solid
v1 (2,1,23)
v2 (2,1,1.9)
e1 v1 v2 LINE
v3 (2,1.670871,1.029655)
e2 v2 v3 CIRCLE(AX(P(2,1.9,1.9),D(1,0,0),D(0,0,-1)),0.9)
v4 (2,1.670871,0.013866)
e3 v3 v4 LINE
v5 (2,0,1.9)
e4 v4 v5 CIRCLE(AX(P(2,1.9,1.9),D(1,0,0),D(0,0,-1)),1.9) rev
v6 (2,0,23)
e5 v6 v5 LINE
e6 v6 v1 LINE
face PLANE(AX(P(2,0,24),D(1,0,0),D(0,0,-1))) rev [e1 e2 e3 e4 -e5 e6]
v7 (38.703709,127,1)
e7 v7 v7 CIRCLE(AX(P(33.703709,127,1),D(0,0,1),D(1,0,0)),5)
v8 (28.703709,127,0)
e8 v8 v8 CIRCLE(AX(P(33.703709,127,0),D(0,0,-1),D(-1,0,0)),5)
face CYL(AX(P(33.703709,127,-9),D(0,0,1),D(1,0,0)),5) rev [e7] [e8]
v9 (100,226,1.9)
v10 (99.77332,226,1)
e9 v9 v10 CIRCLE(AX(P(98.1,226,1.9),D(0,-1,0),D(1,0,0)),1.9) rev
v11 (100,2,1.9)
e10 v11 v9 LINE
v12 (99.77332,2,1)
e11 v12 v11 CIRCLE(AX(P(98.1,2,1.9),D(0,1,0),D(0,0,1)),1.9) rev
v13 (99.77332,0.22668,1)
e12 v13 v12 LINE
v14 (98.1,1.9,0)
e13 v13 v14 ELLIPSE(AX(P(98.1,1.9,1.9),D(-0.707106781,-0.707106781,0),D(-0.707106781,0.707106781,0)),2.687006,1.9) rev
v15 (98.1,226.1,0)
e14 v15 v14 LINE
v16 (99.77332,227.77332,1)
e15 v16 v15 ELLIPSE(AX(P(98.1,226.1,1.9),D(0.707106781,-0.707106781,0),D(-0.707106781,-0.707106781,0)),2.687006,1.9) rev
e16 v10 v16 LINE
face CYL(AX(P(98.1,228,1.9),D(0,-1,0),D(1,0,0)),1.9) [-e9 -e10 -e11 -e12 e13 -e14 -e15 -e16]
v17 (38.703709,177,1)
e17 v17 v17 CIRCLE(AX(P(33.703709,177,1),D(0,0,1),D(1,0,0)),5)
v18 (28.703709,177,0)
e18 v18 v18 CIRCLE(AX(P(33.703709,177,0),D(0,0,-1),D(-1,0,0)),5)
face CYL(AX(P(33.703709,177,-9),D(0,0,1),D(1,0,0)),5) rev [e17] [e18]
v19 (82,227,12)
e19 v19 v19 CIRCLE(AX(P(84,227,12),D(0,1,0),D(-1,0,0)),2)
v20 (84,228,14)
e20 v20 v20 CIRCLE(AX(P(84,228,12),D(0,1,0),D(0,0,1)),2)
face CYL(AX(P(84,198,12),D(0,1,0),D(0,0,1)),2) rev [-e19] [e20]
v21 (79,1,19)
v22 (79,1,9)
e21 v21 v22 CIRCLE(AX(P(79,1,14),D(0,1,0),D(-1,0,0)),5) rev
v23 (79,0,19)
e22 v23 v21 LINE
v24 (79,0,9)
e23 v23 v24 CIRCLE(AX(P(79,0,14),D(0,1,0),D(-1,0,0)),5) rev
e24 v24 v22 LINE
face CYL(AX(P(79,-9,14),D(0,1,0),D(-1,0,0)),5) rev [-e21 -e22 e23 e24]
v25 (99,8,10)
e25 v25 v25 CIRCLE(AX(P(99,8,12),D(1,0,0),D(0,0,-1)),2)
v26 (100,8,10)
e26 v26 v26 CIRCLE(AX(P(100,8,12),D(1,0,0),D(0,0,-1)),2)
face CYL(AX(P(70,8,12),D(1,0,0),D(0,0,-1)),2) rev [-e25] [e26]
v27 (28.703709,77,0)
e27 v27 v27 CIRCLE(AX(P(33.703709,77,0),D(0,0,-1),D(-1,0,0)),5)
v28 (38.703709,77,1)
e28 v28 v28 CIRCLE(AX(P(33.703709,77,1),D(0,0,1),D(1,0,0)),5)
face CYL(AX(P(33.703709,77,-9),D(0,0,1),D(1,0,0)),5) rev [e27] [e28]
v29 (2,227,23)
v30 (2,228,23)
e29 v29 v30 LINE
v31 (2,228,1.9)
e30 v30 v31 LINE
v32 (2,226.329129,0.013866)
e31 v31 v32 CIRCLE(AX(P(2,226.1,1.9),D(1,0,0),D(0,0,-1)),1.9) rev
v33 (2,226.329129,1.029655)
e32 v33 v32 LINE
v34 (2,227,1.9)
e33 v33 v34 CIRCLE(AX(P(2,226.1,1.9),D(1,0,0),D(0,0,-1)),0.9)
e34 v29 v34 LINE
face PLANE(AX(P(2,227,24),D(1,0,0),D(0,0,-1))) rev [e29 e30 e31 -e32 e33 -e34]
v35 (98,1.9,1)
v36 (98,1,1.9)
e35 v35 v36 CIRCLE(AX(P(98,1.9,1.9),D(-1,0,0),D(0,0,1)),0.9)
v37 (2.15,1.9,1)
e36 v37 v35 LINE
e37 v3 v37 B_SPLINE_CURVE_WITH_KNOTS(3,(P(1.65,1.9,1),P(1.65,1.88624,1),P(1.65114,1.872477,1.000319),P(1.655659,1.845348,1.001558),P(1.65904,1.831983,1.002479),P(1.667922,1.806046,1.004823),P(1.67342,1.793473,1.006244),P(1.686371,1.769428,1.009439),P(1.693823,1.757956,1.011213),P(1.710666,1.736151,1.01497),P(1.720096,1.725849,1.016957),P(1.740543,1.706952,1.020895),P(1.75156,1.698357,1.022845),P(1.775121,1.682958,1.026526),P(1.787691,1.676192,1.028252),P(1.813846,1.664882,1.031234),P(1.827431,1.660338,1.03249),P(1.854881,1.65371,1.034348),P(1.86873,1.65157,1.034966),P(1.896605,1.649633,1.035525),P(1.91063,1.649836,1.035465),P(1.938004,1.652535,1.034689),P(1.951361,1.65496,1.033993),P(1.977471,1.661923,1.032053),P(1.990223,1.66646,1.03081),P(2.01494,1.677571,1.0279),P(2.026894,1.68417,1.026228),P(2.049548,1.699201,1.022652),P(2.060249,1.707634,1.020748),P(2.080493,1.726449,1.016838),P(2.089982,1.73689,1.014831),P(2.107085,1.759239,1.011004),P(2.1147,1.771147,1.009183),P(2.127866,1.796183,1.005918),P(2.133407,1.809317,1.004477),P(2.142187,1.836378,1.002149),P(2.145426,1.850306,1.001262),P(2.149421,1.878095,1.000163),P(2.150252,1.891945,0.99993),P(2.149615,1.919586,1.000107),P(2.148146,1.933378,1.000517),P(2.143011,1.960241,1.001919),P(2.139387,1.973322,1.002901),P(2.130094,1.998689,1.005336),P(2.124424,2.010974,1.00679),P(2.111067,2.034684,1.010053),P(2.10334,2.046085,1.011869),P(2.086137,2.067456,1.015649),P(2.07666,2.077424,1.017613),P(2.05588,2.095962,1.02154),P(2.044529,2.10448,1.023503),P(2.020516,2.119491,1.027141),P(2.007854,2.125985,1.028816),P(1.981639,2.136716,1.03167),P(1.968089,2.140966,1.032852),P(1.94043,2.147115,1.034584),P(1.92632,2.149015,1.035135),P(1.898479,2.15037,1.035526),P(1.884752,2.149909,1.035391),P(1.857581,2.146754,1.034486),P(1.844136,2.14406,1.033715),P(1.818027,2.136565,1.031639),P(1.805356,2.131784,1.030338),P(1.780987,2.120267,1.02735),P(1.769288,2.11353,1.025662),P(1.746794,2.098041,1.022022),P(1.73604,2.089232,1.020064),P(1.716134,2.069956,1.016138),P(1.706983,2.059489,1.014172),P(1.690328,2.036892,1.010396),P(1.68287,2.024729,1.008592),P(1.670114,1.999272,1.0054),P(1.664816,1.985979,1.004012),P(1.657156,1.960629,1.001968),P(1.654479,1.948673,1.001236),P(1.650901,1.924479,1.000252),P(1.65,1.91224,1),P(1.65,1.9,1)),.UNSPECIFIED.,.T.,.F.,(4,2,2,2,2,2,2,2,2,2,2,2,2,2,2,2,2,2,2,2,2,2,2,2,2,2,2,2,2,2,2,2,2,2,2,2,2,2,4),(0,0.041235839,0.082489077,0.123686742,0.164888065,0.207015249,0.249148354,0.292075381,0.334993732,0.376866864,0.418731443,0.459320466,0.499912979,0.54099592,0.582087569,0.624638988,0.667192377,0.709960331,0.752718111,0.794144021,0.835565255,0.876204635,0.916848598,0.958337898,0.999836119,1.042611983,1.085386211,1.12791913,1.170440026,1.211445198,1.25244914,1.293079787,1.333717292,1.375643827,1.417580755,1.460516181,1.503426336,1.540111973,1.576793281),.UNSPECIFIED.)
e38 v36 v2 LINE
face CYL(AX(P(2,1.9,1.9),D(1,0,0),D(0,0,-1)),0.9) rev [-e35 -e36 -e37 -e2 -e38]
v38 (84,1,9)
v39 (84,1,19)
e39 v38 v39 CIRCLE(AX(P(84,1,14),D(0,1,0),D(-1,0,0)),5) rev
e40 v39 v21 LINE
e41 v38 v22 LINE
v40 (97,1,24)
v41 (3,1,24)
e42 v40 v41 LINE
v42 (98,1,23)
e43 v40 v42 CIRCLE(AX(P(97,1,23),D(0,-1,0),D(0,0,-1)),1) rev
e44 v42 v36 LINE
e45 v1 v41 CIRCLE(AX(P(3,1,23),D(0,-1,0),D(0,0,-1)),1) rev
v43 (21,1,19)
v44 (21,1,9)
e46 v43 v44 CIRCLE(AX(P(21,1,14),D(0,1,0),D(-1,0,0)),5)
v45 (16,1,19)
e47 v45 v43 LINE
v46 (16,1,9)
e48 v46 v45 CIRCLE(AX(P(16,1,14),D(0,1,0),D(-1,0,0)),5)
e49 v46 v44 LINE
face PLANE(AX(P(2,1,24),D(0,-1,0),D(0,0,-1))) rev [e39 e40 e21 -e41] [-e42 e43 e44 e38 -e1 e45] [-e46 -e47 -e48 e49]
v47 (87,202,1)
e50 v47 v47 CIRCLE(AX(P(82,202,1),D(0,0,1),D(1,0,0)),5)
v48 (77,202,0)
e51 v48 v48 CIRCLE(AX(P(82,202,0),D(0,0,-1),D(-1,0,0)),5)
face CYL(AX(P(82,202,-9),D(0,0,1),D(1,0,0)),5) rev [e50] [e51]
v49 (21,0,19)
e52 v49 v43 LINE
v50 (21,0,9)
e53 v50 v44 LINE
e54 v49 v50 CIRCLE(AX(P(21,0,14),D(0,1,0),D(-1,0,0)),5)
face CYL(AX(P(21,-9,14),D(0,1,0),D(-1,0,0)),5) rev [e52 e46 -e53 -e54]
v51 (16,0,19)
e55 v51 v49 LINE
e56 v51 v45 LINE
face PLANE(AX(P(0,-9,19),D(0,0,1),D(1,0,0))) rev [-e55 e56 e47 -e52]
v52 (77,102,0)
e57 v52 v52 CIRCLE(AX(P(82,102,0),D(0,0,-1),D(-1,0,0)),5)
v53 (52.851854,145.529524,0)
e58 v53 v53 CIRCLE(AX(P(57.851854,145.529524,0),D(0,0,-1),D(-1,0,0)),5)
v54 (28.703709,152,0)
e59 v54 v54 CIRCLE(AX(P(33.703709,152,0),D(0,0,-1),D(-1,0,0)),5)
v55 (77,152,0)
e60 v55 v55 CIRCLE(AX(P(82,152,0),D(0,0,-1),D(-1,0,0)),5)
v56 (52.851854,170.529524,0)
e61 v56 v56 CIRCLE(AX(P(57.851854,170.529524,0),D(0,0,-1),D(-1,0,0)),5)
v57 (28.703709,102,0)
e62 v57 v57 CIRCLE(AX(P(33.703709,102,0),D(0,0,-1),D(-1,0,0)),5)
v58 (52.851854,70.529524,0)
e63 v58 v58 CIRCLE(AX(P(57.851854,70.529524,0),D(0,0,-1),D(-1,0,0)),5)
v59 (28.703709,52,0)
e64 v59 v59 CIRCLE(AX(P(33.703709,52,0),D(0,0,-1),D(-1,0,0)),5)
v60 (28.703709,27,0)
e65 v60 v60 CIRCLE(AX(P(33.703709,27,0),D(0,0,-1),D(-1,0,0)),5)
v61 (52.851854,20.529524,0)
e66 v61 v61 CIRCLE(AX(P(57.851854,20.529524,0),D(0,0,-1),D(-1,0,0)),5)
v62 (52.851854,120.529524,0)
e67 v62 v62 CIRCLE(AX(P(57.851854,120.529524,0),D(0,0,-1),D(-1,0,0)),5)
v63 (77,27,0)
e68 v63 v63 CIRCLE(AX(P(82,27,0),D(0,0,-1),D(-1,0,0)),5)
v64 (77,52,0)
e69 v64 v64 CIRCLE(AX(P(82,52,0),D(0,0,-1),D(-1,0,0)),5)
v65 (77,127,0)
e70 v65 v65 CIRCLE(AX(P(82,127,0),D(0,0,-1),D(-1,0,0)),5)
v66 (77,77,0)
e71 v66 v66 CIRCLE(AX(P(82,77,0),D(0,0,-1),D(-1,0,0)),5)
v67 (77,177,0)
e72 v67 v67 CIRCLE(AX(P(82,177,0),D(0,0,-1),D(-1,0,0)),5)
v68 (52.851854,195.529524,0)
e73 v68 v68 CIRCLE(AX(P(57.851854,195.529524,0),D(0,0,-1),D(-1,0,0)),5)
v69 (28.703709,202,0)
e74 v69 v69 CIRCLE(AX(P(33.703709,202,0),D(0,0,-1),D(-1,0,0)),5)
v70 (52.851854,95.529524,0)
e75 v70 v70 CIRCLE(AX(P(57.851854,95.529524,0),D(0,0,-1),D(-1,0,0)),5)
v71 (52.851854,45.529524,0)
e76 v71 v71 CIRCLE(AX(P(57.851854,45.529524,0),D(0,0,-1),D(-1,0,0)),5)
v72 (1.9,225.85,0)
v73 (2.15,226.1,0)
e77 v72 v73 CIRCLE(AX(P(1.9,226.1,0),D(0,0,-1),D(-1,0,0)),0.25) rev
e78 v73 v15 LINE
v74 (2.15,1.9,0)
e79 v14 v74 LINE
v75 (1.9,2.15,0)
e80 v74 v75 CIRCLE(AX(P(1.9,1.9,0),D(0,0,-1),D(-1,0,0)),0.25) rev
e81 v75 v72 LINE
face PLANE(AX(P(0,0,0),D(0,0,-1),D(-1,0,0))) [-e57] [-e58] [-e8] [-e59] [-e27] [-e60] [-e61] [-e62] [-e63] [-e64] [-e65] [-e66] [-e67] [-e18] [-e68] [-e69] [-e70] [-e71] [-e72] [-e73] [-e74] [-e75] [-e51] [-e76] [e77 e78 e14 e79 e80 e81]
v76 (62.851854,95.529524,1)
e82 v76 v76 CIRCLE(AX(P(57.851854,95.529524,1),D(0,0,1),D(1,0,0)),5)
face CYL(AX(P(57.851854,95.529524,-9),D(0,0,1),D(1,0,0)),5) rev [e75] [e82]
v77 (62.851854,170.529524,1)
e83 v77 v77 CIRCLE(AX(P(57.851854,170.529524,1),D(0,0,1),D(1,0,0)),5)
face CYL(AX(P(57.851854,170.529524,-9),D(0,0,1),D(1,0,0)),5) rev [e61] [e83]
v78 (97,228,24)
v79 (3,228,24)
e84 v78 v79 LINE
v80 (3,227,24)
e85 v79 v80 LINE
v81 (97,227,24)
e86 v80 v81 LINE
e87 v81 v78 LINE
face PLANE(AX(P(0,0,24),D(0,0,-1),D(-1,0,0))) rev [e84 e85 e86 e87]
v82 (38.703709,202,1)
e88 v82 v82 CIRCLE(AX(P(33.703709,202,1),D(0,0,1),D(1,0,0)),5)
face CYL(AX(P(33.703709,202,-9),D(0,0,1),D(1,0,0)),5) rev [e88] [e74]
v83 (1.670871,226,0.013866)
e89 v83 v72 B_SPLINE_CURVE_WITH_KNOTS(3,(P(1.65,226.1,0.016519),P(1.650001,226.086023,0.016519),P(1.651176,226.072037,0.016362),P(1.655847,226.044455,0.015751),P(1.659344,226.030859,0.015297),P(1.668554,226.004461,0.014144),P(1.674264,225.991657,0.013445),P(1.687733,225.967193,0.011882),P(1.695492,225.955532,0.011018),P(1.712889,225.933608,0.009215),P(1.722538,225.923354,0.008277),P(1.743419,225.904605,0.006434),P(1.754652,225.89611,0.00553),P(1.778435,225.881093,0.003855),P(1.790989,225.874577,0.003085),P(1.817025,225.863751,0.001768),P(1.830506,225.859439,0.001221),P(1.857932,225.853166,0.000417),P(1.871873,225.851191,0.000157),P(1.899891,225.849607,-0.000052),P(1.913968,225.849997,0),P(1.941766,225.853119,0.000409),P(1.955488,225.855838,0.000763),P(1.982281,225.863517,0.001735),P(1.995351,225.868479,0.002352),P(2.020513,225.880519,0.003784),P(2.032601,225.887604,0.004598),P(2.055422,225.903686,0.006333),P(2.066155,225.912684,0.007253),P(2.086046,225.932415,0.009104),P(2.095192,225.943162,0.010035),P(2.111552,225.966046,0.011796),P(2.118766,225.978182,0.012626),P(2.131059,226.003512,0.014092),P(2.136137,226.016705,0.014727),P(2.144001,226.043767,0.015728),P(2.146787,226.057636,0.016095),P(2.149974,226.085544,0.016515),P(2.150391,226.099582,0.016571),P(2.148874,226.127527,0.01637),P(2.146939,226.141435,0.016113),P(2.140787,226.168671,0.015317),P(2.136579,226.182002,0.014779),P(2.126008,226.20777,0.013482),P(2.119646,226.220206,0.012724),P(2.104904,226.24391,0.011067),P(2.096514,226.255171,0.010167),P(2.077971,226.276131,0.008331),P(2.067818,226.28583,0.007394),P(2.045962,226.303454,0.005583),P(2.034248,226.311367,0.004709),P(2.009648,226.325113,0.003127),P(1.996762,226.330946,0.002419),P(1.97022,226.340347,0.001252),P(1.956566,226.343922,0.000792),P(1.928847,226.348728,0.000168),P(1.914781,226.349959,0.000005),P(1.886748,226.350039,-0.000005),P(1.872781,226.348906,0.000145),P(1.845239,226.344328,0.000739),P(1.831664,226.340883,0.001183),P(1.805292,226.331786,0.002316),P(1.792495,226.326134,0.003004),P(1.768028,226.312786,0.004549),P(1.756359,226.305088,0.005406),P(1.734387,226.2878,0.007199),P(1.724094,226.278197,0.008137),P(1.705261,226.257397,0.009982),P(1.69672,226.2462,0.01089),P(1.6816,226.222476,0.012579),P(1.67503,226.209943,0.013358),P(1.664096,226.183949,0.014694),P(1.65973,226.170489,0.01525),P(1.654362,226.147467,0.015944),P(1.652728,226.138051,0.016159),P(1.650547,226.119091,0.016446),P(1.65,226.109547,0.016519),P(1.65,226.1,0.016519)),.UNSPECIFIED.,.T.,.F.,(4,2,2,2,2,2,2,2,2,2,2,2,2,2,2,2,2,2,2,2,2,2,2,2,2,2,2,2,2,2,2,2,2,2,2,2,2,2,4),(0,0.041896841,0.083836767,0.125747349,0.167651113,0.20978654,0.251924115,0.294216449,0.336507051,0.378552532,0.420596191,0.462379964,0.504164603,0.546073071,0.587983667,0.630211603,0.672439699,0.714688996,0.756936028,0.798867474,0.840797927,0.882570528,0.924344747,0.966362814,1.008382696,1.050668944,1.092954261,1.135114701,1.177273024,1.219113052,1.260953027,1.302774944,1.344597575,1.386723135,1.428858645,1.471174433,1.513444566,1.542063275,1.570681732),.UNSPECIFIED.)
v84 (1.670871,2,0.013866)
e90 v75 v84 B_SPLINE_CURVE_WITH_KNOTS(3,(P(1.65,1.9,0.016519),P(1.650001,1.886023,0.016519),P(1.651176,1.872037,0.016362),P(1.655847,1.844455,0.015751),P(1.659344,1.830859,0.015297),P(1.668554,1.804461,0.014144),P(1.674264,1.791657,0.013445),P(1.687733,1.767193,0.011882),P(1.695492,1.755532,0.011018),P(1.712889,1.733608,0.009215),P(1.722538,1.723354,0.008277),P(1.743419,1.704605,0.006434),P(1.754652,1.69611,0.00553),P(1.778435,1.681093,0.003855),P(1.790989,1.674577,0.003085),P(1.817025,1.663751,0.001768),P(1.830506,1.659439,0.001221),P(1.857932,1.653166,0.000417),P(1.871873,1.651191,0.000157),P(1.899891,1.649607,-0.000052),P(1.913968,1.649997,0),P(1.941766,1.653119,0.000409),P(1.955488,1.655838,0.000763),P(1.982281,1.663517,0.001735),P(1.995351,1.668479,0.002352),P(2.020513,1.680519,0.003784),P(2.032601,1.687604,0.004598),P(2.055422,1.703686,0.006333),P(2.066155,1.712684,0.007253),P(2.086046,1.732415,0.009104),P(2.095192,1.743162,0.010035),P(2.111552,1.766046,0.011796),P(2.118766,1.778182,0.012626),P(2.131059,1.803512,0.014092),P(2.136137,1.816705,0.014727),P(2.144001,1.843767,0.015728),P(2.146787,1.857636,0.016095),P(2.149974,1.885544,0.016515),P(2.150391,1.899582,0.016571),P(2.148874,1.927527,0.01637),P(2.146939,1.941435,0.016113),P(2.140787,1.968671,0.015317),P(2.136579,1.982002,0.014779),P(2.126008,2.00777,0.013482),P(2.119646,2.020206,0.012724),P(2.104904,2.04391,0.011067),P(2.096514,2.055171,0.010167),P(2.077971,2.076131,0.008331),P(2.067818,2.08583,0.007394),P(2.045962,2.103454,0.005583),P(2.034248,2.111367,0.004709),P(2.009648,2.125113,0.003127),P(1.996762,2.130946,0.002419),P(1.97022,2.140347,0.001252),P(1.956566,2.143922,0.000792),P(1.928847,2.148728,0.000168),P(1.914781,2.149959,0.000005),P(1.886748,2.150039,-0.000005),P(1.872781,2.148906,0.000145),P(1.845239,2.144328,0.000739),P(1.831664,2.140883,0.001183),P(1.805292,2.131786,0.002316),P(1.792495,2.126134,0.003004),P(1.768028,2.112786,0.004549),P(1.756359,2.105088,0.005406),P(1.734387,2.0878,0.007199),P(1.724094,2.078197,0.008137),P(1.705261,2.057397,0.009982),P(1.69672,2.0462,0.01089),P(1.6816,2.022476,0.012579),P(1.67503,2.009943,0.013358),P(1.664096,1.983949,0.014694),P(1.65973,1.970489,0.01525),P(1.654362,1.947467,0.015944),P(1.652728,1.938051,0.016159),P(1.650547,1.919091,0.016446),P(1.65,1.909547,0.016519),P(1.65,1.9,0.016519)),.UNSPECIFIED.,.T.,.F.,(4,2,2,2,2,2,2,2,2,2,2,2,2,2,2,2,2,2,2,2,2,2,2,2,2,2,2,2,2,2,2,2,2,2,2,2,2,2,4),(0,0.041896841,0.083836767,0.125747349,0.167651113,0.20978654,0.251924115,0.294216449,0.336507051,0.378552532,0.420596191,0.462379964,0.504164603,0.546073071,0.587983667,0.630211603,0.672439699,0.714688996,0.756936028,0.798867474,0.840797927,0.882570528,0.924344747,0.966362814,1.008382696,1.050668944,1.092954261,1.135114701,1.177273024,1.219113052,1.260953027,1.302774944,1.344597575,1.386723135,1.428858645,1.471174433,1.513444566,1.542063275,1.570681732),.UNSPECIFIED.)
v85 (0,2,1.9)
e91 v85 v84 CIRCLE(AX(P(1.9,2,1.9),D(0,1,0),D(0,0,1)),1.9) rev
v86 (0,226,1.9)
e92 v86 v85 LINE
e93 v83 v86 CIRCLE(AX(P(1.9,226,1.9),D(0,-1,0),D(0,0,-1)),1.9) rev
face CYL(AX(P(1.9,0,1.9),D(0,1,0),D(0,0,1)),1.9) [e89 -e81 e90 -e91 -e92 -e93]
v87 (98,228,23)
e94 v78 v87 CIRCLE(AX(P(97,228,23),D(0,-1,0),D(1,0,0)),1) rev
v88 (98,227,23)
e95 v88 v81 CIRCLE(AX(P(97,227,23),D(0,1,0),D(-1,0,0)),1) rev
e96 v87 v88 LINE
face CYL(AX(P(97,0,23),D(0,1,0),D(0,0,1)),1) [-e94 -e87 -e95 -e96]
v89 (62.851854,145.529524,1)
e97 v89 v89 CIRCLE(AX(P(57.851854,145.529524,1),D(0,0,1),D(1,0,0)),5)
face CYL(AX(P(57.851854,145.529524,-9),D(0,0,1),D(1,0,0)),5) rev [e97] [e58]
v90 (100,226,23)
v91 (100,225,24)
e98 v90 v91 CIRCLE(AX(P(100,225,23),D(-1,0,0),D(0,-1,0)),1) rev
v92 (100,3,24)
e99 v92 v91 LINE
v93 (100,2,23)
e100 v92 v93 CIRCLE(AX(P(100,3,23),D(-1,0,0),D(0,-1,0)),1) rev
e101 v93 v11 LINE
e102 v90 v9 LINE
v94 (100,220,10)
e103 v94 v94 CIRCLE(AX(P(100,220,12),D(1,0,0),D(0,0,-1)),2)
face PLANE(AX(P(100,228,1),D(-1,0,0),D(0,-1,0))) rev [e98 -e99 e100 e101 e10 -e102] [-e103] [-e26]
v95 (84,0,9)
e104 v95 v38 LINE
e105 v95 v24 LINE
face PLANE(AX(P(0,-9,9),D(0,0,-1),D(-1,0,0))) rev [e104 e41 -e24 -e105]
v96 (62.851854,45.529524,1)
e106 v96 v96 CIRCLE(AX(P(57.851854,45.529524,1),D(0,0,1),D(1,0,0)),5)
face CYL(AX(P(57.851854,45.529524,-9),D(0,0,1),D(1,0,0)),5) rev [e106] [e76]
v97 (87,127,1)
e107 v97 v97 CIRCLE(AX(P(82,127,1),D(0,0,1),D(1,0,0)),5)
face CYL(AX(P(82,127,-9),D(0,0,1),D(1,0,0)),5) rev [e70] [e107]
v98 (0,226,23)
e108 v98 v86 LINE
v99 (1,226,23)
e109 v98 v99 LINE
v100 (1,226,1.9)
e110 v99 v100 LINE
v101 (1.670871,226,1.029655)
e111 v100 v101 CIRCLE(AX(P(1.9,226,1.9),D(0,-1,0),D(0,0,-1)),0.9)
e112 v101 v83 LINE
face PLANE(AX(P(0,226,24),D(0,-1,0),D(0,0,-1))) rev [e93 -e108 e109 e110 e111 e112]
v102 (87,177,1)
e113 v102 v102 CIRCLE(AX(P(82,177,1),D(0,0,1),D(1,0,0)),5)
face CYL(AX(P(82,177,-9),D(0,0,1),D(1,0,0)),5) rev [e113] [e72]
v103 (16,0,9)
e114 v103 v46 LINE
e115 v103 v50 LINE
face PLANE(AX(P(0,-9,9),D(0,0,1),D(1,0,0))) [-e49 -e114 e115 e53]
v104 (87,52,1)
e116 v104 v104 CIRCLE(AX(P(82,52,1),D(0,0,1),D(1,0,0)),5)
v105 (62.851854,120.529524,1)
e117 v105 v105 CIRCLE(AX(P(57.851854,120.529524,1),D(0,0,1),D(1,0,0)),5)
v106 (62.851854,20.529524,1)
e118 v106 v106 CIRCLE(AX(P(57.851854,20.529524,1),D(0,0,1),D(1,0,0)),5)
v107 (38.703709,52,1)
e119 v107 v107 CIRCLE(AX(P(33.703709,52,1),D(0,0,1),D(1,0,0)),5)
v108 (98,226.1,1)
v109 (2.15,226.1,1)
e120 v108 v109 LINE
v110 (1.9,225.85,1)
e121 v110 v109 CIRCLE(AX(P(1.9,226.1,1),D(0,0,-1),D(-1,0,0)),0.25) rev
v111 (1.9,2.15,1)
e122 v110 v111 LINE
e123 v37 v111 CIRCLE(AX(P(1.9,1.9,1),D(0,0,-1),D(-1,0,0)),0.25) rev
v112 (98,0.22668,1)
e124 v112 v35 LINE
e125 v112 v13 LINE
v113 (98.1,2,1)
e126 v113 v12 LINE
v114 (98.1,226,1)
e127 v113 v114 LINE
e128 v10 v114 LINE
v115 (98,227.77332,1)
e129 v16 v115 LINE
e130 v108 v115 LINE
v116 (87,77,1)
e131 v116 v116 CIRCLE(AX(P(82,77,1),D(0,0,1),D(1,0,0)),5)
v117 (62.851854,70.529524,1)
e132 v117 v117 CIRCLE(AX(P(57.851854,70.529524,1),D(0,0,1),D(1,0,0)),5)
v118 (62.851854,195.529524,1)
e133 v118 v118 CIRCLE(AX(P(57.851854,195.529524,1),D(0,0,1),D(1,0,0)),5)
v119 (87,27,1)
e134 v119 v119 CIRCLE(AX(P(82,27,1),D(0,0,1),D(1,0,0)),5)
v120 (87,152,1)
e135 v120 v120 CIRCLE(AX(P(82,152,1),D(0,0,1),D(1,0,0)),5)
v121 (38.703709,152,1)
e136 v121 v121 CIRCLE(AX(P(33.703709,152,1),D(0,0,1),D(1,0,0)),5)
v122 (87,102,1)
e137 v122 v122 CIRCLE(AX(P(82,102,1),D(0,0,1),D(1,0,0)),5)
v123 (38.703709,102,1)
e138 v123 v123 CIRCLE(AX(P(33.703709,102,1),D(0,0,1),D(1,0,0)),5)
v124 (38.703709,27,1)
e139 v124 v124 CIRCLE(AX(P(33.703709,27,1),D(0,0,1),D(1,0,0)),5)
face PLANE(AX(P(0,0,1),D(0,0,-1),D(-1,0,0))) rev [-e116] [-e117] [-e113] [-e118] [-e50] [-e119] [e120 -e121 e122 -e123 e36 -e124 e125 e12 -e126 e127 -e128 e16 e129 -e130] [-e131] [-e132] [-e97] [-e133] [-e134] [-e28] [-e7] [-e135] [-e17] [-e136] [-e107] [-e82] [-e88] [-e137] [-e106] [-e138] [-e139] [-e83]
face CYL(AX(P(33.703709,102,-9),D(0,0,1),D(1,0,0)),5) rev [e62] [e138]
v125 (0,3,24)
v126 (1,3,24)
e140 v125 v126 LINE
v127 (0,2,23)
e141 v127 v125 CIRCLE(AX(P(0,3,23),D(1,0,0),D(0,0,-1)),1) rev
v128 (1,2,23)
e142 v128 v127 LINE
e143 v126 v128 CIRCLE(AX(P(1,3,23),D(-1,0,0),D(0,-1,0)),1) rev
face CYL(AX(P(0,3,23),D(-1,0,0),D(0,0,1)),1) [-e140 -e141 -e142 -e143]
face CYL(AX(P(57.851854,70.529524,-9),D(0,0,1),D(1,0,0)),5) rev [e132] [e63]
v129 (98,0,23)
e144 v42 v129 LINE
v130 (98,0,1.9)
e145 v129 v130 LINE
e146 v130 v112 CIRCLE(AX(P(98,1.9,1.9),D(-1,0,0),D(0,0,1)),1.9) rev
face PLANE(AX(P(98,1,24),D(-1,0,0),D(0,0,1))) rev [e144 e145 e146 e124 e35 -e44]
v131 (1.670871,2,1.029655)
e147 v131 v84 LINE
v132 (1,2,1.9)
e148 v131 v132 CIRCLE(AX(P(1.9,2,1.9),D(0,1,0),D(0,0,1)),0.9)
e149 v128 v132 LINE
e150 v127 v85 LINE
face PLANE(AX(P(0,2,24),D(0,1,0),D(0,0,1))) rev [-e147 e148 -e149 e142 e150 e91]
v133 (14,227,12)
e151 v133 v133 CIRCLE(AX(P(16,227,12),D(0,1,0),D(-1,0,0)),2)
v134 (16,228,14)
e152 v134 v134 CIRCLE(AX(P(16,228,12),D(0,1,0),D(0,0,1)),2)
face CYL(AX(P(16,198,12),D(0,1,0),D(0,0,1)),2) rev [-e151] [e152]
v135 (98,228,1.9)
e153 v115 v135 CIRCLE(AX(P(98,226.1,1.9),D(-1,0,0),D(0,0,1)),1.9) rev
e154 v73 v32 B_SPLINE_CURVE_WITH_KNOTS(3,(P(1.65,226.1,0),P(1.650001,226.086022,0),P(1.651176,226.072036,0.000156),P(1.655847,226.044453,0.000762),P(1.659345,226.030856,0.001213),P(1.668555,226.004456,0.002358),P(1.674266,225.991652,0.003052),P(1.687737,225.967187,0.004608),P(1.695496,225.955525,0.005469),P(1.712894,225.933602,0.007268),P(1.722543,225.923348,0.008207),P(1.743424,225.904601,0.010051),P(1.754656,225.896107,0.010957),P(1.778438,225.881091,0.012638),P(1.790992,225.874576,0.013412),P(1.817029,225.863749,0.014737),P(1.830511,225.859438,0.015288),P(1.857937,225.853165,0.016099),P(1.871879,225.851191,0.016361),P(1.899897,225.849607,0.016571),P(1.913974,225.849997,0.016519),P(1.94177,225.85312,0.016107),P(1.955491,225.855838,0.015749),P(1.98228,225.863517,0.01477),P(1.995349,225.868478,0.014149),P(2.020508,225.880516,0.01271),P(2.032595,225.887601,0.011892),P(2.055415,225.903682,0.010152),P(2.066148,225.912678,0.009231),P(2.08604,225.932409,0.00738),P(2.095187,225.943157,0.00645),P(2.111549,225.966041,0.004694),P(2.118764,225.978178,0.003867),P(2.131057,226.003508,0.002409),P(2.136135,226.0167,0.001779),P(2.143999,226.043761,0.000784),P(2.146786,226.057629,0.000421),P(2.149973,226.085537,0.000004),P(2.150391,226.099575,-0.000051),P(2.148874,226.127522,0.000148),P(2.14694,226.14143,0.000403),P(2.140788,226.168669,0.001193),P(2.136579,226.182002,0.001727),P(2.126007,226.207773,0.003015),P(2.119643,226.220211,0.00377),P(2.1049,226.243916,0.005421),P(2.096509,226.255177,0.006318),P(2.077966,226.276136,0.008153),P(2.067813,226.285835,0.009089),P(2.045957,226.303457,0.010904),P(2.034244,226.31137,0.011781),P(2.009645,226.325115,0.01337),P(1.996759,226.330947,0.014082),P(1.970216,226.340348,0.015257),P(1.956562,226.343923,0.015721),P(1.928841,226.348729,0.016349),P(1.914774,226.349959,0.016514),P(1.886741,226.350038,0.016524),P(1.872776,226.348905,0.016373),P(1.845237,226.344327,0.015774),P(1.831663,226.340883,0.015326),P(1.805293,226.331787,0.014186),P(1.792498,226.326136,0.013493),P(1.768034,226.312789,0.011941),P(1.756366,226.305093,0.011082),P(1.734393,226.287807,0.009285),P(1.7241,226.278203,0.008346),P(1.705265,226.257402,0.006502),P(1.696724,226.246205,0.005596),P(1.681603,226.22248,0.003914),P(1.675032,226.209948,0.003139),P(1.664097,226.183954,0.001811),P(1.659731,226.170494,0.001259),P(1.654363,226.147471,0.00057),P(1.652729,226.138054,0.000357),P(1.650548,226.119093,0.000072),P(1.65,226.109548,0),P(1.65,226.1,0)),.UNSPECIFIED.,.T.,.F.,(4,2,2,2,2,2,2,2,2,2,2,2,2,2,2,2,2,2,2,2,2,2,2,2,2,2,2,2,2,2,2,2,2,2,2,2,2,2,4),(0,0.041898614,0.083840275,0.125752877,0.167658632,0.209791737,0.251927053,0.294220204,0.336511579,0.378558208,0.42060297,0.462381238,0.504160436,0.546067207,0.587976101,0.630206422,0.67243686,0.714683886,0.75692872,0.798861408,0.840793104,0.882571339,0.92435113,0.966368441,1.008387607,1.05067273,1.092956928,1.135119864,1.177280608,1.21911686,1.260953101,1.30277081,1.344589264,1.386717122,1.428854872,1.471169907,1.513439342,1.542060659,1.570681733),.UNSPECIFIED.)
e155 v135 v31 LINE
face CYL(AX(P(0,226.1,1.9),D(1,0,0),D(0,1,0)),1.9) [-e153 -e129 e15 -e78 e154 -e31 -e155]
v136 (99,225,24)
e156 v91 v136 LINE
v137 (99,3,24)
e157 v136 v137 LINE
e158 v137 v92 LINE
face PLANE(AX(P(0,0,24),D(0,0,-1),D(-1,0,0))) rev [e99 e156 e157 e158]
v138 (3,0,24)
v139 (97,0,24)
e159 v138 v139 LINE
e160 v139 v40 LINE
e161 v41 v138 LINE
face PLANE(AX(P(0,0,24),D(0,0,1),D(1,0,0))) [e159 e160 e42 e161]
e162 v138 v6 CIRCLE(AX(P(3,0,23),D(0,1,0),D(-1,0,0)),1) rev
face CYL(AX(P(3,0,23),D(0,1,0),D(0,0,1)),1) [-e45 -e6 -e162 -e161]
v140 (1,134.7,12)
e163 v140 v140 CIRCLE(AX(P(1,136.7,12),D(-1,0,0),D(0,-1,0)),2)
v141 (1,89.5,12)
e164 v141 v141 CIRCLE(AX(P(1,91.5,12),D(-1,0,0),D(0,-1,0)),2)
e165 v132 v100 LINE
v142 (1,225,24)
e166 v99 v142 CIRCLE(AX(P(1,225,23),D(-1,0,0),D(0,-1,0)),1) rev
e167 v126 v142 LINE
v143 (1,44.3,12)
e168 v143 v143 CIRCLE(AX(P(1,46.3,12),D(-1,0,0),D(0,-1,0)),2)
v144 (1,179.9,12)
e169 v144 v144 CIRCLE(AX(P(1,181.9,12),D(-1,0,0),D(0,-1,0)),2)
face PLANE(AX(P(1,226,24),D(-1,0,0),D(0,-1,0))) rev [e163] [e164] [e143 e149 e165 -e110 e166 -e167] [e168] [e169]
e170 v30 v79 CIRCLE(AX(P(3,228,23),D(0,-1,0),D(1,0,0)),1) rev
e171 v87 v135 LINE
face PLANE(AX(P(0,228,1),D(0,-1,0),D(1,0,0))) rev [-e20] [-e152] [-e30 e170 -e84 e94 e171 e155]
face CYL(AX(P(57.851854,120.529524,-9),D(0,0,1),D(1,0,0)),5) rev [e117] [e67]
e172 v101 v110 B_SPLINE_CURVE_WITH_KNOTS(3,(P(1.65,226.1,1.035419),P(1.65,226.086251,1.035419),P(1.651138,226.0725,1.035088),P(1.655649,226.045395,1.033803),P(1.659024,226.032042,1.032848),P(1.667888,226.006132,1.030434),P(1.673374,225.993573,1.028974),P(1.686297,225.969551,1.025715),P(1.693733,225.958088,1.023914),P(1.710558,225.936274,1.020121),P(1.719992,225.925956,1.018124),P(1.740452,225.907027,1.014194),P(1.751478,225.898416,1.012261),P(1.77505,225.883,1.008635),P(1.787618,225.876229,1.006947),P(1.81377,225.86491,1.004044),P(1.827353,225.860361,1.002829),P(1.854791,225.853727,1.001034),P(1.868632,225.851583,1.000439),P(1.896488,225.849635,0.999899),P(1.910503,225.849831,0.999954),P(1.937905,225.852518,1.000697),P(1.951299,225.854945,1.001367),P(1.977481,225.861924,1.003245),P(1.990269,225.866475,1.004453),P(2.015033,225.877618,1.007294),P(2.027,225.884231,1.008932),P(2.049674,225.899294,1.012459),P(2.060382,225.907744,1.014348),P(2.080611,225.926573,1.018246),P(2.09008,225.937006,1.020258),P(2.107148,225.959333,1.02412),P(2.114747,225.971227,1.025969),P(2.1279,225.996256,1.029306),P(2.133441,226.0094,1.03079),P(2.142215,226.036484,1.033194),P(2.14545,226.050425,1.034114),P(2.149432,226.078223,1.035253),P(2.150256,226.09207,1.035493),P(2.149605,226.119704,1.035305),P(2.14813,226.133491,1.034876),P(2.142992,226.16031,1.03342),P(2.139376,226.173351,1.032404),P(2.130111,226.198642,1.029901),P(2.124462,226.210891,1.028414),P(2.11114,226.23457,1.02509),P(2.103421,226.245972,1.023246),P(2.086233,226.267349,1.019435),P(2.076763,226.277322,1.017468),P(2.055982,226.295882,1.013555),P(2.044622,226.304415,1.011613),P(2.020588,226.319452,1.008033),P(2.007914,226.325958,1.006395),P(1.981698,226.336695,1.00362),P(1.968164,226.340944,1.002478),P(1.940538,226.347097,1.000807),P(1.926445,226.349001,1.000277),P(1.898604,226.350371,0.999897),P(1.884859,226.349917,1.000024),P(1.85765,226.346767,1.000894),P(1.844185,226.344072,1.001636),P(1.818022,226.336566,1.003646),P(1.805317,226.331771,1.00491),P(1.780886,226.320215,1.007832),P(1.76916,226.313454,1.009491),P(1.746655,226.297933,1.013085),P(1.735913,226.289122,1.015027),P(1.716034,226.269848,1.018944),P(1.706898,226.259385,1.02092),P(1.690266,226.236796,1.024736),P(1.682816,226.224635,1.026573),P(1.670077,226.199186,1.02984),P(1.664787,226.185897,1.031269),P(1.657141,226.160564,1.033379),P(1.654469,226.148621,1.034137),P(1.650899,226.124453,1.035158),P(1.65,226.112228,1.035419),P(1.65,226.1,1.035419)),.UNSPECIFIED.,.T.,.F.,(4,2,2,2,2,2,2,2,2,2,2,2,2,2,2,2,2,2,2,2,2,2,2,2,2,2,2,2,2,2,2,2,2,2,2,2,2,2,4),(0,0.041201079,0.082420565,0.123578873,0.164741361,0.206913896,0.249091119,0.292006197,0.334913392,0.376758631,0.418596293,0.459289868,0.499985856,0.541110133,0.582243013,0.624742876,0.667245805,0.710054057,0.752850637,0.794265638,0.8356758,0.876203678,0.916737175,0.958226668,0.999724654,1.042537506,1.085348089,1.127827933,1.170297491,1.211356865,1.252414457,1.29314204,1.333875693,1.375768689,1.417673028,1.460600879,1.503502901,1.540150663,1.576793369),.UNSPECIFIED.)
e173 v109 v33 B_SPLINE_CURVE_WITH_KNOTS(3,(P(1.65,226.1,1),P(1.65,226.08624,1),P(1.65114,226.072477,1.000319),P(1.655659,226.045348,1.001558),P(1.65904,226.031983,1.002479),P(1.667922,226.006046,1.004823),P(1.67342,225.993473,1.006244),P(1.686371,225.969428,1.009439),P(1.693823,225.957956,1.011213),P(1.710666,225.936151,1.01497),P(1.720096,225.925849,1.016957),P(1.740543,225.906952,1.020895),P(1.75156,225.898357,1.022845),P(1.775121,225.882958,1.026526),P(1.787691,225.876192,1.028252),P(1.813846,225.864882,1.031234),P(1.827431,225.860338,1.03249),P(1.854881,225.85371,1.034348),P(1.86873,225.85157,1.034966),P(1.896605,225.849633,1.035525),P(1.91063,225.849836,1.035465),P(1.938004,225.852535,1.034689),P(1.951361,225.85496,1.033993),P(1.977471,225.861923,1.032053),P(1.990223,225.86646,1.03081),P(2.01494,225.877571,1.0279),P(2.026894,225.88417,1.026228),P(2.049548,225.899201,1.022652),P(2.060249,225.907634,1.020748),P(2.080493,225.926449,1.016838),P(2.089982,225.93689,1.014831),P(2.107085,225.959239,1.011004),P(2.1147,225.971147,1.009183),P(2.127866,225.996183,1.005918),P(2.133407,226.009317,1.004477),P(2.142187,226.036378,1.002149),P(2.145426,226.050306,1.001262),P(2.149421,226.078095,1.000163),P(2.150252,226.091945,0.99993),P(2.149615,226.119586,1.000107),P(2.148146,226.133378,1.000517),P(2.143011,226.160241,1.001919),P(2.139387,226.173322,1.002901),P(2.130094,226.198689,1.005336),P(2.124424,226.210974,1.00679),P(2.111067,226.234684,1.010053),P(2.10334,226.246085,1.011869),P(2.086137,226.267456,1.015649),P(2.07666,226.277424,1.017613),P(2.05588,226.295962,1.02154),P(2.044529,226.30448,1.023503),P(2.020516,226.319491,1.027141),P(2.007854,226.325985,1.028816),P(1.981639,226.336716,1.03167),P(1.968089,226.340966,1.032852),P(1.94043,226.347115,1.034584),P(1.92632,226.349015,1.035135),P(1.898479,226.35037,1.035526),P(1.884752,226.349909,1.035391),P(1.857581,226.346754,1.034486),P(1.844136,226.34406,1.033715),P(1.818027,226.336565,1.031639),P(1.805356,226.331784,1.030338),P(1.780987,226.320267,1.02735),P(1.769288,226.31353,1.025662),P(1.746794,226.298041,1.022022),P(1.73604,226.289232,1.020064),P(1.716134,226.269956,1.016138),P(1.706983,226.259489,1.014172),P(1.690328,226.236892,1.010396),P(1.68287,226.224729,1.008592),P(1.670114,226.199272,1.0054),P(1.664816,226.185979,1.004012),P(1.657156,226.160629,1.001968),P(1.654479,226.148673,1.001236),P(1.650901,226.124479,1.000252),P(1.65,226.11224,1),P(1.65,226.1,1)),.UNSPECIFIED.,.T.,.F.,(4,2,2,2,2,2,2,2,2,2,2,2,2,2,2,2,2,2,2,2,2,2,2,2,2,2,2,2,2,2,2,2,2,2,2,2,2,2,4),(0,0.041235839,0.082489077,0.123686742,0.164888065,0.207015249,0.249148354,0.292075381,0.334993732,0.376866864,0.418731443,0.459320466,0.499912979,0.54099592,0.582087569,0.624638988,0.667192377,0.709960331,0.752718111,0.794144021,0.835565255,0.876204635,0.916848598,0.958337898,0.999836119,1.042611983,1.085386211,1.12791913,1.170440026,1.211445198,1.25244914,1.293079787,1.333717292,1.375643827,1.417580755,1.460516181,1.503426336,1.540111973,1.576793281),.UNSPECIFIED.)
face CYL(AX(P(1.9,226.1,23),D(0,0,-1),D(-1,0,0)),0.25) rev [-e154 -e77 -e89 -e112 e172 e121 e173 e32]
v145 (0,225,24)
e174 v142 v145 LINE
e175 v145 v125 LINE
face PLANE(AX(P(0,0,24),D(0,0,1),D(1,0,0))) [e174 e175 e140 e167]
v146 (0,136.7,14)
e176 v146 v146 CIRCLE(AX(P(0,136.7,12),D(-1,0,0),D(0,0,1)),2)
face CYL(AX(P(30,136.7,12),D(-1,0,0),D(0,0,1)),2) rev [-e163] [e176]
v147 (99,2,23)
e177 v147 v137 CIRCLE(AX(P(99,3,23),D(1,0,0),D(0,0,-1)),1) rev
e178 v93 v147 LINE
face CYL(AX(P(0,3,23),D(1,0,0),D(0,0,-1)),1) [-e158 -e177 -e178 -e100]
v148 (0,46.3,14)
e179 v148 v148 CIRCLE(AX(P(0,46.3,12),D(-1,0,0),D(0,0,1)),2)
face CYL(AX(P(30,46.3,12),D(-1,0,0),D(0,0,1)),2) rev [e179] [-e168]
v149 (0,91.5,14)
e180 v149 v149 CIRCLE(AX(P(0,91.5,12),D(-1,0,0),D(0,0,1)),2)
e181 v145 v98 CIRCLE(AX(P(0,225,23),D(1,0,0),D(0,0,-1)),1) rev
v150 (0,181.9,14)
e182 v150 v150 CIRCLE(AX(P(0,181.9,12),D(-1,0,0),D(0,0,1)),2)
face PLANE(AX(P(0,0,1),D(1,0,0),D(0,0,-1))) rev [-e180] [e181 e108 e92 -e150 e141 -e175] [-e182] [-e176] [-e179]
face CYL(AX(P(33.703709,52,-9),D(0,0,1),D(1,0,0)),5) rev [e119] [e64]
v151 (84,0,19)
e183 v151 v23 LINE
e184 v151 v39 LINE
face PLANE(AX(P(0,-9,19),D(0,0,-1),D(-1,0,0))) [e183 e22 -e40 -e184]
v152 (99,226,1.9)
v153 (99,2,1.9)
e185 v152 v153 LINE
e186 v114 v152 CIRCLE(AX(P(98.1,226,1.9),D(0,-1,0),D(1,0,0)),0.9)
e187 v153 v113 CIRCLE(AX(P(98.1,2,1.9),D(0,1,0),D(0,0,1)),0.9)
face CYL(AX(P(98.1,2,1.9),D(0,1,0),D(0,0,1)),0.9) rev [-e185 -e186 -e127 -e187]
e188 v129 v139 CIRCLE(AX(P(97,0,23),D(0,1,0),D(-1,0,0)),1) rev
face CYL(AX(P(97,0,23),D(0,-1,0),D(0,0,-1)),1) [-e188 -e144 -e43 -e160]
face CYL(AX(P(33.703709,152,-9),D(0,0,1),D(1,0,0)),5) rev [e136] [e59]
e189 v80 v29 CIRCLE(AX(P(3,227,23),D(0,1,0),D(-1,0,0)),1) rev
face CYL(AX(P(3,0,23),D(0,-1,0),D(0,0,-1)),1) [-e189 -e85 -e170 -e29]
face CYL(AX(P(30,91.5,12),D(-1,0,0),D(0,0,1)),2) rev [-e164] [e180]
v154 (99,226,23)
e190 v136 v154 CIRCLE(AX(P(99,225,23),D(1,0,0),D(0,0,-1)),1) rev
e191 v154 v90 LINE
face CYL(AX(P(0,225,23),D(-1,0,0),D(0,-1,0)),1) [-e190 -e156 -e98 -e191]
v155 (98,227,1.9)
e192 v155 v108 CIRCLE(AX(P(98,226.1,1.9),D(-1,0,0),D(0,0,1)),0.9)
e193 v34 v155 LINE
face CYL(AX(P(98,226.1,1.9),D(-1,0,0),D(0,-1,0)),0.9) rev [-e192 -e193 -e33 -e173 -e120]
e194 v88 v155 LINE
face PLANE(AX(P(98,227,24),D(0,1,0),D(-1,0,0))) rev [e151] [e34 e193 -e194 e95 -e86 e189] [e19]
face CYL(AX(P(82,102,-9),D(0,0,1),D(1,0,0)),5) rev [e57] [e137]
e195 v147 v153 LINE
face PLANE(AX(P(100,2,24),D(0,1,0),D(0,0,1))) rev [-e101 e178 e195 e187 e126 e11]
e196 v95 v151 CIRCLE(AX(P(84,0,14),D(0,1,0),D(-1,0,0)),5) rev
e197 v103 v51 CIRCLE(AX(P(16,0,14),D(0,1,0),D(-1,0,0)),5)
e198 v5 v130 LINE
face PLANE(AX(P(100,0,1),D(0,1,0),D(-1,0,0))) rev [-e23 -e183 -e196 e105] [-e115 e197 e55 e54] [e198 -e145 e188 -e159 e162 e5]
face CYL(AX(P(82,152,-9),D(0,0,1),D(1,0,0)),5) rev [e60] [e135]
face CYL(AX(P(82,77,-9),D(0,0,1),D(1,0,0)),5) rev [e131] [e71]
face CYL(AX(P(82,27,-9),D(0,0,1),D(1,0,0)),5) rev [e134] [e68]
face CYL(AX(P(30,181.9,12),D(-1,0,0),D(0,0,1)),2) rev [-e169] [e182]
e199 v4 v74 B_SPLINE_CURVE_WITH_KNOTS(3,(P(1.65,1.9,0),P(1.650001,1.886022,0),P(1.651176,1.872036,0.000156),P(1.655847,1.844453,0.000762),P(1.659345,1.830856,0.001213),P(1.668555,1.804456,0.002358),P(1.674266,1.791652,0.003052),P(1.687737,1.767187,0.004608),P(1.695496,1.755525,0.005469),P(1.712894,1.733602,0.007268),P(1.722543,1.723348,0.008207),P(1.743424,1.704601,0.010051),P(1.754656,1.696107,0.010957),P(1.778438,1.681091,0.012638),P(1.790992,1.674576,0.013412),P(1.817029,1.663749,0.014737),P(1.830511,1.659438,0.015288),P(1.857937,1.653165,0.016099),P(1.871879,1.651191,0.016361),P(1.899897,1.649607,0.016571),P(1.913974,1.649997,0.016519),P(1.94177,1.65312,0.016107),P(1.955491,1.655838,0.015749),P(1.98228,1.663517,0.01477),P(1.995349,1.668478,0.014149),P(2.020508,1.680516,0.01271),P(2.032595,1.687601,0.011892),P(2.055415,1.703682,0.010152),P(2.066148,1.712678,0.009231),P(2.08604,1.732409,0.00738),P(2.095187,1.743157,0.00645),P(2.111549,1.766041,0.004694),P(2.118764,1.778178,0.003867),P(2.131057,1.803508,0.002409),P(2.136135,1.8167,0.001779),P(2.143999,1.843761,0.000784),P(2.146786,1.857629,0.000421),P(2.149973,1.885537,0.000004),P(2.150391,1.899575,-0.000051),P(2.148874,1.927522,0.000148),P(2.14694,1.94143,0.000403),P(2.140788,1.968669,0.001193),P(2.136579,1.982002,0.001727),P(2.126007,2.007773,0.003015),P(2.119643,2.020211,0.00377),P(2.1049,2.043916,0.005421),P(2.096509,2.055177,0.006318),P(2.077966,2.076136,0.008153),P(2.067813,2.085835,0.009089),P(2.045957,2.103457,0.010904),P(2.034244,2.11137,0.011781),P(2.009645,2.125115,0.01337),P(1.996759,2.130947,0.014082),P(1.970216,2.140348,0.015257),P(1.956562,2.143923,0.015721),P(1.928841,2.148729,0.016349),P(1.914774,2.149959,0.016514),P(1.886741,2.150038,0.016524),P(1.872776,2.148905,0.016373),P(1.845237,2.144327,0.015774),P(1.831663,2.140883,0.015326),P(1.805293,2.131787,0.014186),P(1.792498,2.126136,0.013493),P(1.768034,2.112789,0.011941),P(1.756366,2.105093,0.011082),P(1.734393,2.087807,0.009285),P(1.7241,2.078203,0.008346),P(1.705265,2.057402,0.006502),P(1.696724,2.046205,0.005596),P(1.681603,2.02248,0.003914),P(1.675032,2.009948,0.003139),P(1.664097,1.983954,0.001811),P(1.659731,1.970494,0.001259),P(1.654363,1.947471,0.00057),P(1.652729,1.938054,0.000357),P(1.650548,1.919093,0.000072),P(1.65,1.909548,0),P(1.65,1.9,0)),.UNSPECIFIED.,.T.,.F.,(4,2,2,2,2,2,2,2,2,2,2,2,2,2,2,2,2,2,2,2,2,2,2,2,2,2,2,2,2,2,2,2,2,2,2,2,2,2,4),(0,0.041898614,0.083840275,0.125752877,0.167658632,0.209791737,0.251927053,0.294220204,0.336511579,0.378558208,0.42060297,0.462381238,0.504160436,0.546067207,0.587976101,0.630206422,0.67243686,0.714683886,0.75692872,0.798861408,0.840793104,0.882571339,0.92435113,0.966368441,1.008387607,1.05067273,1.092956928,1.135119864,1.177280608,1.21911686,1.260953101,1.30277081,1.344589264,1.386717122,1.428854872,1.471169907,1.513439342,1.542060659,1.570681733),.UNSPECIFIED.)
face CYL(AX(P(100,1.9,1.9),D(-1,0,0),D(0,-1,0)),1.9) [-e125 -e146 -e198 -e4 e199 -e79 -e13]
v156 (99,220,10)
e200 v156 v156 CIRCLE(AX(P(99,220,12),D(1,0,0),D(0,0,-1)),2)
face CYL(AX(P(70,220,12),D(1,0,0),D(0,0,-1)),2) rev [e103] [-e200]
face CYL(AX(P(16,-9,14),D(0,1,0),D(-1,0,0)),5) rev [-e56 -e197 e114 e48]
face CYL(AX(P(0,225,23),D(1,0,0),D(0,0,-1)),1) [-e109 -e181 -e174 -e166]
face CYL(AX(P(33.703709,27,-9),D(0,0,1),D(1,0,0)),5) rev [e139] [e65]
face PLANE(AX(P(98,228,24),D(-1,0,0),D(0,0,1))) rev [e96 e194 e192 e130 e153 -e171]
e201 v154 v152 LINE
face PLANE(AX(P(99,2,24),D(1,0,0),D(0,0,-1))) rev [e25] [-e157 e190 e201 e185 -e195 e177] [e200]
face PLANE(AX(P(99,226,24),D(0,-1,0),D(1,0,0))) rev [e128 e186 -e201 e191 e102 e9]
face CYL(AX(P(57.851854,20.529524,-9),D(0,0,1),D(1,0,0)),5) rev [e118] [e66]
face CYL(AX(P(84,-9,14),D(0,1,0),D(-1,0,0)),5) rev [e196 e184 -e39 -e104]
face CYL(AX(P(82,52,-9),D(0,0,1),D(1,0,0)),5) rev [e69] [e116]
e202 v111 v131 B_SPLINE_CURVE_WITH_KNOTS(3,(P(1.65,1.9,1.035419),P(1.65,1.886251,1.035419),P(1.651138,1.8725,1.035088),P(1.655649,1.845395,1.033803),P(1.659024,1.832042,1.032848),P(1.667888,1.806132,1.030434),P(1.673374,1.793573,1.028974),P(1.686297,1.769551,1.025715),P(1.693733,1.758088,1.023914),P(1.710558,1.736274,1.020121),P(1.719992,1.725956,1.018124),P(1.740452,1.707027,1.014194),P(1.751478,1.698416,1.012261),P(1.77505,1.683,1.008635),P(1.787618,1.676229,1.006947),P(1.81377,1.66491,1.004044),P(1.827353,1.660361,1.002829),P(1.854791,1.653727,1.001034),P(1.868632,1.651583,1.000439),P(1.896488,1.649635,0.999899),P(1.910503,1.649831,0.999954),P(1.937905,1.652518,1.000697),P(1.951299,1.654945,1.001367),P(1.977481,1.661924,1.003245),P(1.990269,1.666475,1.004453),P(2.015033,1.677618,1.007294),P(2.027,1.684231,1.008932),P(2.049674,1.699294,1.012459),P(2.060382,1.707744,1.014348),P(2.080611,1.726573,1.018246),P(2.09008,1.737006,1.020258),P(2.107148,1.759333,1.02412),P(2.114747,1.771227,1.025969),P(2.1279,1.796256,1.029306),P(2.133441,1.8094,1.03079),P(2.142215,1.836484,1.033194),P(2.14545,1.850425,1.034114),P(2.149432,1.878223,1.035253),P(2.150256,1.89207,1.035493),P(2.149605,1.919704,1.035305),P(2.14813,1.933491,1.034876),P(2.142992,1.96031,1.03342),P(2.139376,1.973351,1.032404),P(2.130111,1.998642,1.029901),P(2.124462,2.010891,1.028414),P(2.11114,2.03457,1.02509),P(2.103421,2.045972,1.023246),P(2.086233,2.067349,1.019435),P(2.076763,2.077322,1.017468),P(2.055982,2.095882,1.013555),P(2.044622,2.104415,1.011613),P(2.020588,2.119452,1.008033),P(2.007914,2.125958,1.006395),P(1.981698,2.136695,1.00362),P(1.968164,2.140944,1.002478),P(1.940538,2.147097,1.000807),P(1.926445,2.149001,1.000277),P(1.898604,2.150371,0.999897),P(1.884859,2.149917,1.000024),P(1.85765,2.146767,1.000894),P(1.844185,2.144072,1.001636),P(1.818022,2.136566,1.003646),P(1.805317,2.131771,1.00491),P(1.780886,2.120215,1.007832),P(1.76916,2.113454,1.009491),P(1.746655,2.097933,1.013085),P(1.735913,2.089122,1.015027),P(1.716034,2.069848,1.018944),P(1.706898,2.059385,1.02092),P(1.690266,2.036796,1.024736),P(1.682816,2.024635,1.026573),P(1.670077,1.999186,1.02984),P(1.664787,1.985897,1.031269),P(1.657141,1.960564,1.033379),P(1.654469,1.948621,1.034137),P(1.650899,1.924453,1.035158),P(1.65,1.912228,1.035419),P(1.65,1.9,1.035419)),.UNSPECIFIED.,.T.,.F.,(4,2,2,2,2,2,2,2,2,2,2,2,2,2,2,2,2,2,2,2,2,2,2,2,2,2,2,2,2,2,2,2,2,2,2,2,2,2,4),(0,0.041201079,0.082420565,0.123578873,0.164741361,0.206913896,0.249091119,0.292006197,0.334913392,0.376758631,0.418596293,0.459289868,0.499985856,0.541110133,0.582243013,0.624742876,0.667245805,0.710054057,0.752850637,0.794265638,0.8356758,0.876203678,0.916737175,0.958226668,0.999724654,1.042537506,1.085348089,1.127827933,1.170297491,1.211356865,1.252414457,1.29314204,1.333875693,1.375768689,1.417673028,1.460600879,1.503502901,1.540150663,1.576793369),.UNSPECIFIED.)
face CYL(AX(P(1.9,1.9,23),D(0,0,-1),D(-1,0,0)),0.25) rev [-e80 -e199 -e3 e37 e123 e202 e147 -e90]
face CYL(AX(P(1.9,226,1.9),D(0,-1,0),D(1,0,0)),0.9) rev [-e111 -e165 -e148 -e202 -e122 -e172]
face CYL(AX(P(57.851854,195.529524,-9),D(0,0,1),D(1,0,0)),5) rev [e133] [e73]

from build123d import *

# Parameters (mm, degrees)
SKETCH_1_W               = 100
SKETCH_1_H               = 228
EXTRUDE_1_DEPTH          = 1
SKETCH_2_W               = 96
SKETCH_2_H               = 1
SKETCH_2_W_2             = 1
SKETCH_2_H_2             = 224
EXTRUDE_2_DEPTH          = 23
FILLET_1_R               = 0.9
FILLET_2_R               = 1.9
CUT_EXTRUDE_1_DEPTH      = 22
CUT_EXTRUDE_1_DEPTH_BACK = 22
FILLET_3_R               = 1
SKETCH_4_R               = 5
CUT_EXTRUDE_2_DEPTH      = 10
SKETCH_5_R               = 2
CUT_EXTRUDE_3_DEPTH      = 30
SKETCH_6_R               = 2
CUT_EXTRUDE_4_DEPTH      = 30
SKETCH_7_R               = 2
CUT_EXTRUDE_5_DEPTH      = 30
SKETCH_8_R               = 2
CUT_EXTRUDE_6_DEPTH      = 30
CUT_EXTRUDE_7_DEPTH      = 10


with BuildPart() as part:
    # Эскиз1 → Бобышка-Вытянуть1 (new body)
    with BuildSketch(Plane.XY):
        with Locations((50, 114)):
            Rectangle(SKETCH_1_W, SKETCH_1_H)
    extrude(amount=EXTRUDE_1_DEPTH)

    # Эскиз2 → Бобышка-Вытянуть2 (add)
    with BuildSketch(Plane.XY.offset(1)):
        with Locations((50, 227.5)):
            Rectangle(SKETCH_2_W, SKETCH_2_H)
        with Locations((50, 0.5)):
            Rectangle(SKETCH_2_W, SKETCH_2_H)
        with Locations((99.5, 114)):
            Rectangle(SKETCH_2_W_2, SKETCH_2_H_2)
        with Locations((0.5, 114)):
            Rectangle(SKETCH_2_W_2, SKETCH_2_H_2)
    extrude(amount=EXTRUDE_2_DEPTH)

    # Скругление1
    fillet_1_edges = [part.edges().sort_by_distance(p)[0] for p in [
        (50, 227, 1),
        (50, 1, 1),
        (99, 114, 1),
        (1, 114, 1),
    ]]
    fillet(fillet_1_edges, radius=FILLET_1_R)

    # Скругление2
    # the kernel refuses this fillet: 1.9 mm, written as the material it takes off along each edge
    with BuildSketch(Plane(origin=(-4.75, 228, 0), x_dir=(0, -1, 0), z_dir=(1, 0, 0)), Plane(origin=(104.75, 0, 0), x_dir=(0, 1, 0), z_dir=(-1, 0, 0))) as fillet_2_piece_1:
        with BuildLine():
            CenterArc((FILLET_2_R, -FILLET_2_R), FILLET_2_R, 90, 90)
            Line((0, -FILLET_2_R), (0, 0))
            Line((0, 0), (FILLET_2_R, 0))
        make_face()
    extrude(amount=109.5, mode=Mode.SUBTRACT)
    with BuildSketch(Plane(origin=(100, 232.75, 0), x_dir=(-1, 0, 0), z_dir=(0, -1, 0))) as fillet_2_piece_2:
        with BuildLine():
            CenterArc((FILLET_2_R, -FILLET_2_R), FILLET_2_R, 90, 90)
            Line((0, -FILLET_2_R), (0, 0))
            Line((0, 0), (FILLET_2_R, 0))
        make_face()
    extrude(amount=237.5, mode=Mode.SUBTRACT)
    with BuildSketch(Plane(origin=(0, -4.75, 0), x_dir=(0, 0, 1), z_dir=(0, 1, 0))) as fillet_2_piece_3:
        with BuildLine():
            CenterArc((FILLET_2_R, FILLET_2_R), FILLET_2_R, 180, 90)
            Line((0, FILLET_2_R), (0, 0))
            Line((0, 0), (FILLET_2_R, 0))
        make_face()
    extrude(amount=237.5, mode=Mode.SUBTRACT)

    # Эскиз3 → Вырез-Вытянуть1 (cut, two sides: drawn at the far end of the back side and taken through both)
    with BuildSketch(Plane.XY.offset(1).offset(-CUT_EXTRUDE_1_DEPTH_BACK)):
        with BuildLine():
            Line((0.226679947, 226), (0.226679947, 227.773320053))
            Line((0.226679947, 227.773320053), (2, 227.773320053))
            Line((2, 227.773320053), (2, 226.329128785))
            ThreePointArc((2, 226.329128785), (2.076776695, 225.923223305), (1.670871215, 226))
            Line((1.670871215, 226), (0.226679947, 226))
        make_face()
        with BuildLine():
            Line((118, 226.329128785), (118, 227.773320053))
            Line((118, 227.773320053), (119.773320053, 227.773320053))
            Line((119.773320053, 227.773320053), (119.773320053, 226))
            Line((119.773320053, 226), (118.329128785, 226))
            ThreePointArc((118.329128785, 226), (117.923223305, 225.923223305), (118, 226.329128785))
        make_face()
        with BuildLine():
            Line((2, 1.670871215), (2, 0.226679947))
            Line((2, 0.226679947), (0.226679947, 0.226679947))
            Line((0.226679947, 0.226679947), (0.226679947, 2))
            Line((0.226679947, 2), (1.670871215, 2))
            ThreePointArc((1.670871215, 2), (2.076776695, 2.076776695), (2, 1.670871215))
        make_face()
        with BuildLine():
            Line((119.773320053, 2), (119.773320053, 0.226679947))
            Line((119.773320053, 0.226679947), (118, 0.226679947))
            Line((118, 0.226679947), (118, 1.670871215))
            ThreePointArc((118, 1.670871215), (117.923223305, 2.076776695), (118.329128785, 2))
            Line((118.329128785, 2), (119.773320053, 2))
        make_face()
    extrude(amount=CUT_EXTRUDE_1_DEPTH + CUT_EXTRUDE_1_DEPTH_BACK, mode=Mode.SUBTRACT)

    # Скругление3
    fillet_3_edges = [part.edges().sort_by_distance(p)[0] for p in [
        (98, 227.5, 24),
        (2, 227.5, 24),
        (98, 0.5, 24),
        (2, 0.5, 24),
        (99.5, 2, 24),
        (99.5, 226, 24),
        (0.5, 226, 24),
        (0.5, 2, 24),
    ]]
    fillet(fillet_3_edges, radius=FILLET_3_R)

    # Эскиз4 → Вырез-Вытянуть2 (cut)
    with BuildSketch(Plane.XY.offset(1)):
        with Locations((33.703708686, 202)):
            Circle(SKETCH_4_R)
        with Locations((33.703708686, 177)):
            Circle(SKETCH_4_R)
        with Locations((33.703708686, 152)):
            Circle(SKETCH_4_R)
        with Locations((33.703708686, 127)):
            Circle(SKETCH_4_R)
        with Locations((33.703708686, 102)):
            Circle(SKETCH_4_R)
        with Locations((33.703708686, 77)):
            Circle(SKETCH_4_R)
        with Locations((33.703708686, 52)):
            Circle(SKETCH_4_R)
        with Locations((33.703708686, 27)):
            Circle(SKETCH_4_R)
        with Locations((57.851854343, 20.529523872)):
            Circle(SKETCH_4_R)
        with Locations((57.851854343, 45.529523872)):
            Circle(SKETCH_4_R)
        with Locations((57.851854343, 70.529523872)):
            Circle(SKETCH_4_R)
        with Locations((57.851854343, 95.529523872)):
            Circle(SKETCH_4_R)
        with Locations((57.851854343, 120.529523872)):
            Circle(SKETCH_4_R)
        with Locations((57.851854343, 145.529523872)):
            Circle(SKETCH_4_R)
        with Locations((57.851854343, 170.529523872)):
            Circle(SKETCH_4_R)
        with Locations((57.851854343, 195.529523872)):
            Circle(SKETCH_4_R)
        with Locations((82, 202)):
            Circle(SKETCH_4_R)
        with Locations((82, 177)):
            Circle(SKETCH_4_R)
        with Locations((82, 152)):
            Circle(SKETCH_4_R)
        with Locations((82, 127)):
            Circle(SKETCH_4_R)
        with Locations((82, 102)):
            Circle(SKETCH_4_R)
        with Locations((82, 77)):
            Circle(SKETCH_4_R)
        with Locations((82, 52)):
            Circle(SKETCH_4_R)
        with Locations((82, 27)):
            Circle(SKETCH_4_R)
    extrude(amount=-CUT_EXTRUDE_2_DEPTH, mode=Mode.SUBTRACT)

    # Эскиз5 → Вырез-Вытянуть3 (cut)
    with BuildSketch(Plane(origin=(0, 228, 0), x_dir=(1, 0, 0), z_dir=(0, 1, 0))):
        with Locations(Location((16, -12, 0), (0, 0, 270))):
            Circle(SKETCH_5_R)
        with Locations(Location((84, -12, 0), (0, 0, 270))):
            Circle(SKETCH_5_R)
        with Locations((84, 252)):
            Circle(SKETCH_5_R)
        with Locations((16, 252)):
            Circle(SKETCH_5_R)
    extrude(amount=-CUT_EXTRUDE_3_DEPTH, mode=Mode.SUBTRACT)

    # Эскиз6 → Вырез-Вытянуть4 (cut)
    with BuildSketch(Plane(origin=(100, 0, 0), x_dir=(0, 0, -1), z_dir=(1, 0, 0))):
        with Locations((-12, 220)):
            Circle(SKETCH_6_R)
    extrude(amount=-CUT_EXTRUDE_4_DEPTH, mode=Mode.SUBTRACT)

    # Эскиз7 → Вырез-Вытянуть5 (cut)
    with BuildSketch(Plane(origin=(100, 0, 0), x_dir=(0, 0, -1), z_dir=(1, 0, 0))):
        with Locations((-12, 8)):
            Circle(SKETCH_7_R)
    extrude(amount=-CUT_EXTRUDE_5_DEPTH, mode=Mode.SUBTRACT)

    # Эскиз8 → Вырез-Вытянуть6 (cut)
    with BuildSketch(Plane.ZY):
        with Locations((12, 181.9)):
            Circle(SKETCH_8_R)
        with Locations((12, 46.3)):
            Circle(SKETCH_8_R)
        with Locations((12, 91.5)):
            Circle(SKETCH_8_R)
        with Locations((12, 136.7)):
            Circle(SKETCH_8_R)
    extrude(amount=-CUT_EXTRUDE_6_DEPTH, mode=Mode.SUBTRACT)

    # Эскиз9 → Вырез-Вытянуть7 (cut)
    with BuildSketch(Plane(origin=(0, 1, 0), x_dir=(1, 0, 0), z_dir=(0, 1, 0))):
        with BuildLine():
            Line((16, -9), (21, -9))
            ThreePointArc((21, -9), (26, -14), (21, -19))
            Line((21, -19), (16, -19))
            ThreePointArc((16, -19), (11, -14), (16, -9))
        make_face()
        with BuildLine():
            Line((84, -19), (79, -19))
            ThreePointArc((79, -19), (74, -14), (79, -9))
            Line((79, -9), (84, -9))
            ThreePointArc((84, -9), (89, -14), (84, -19))
        make_face()
    extrude(amount=-CUT_EXTRUDE_7_DEPTH, mode=Mode.SUBTRACT)


solid = part.part
